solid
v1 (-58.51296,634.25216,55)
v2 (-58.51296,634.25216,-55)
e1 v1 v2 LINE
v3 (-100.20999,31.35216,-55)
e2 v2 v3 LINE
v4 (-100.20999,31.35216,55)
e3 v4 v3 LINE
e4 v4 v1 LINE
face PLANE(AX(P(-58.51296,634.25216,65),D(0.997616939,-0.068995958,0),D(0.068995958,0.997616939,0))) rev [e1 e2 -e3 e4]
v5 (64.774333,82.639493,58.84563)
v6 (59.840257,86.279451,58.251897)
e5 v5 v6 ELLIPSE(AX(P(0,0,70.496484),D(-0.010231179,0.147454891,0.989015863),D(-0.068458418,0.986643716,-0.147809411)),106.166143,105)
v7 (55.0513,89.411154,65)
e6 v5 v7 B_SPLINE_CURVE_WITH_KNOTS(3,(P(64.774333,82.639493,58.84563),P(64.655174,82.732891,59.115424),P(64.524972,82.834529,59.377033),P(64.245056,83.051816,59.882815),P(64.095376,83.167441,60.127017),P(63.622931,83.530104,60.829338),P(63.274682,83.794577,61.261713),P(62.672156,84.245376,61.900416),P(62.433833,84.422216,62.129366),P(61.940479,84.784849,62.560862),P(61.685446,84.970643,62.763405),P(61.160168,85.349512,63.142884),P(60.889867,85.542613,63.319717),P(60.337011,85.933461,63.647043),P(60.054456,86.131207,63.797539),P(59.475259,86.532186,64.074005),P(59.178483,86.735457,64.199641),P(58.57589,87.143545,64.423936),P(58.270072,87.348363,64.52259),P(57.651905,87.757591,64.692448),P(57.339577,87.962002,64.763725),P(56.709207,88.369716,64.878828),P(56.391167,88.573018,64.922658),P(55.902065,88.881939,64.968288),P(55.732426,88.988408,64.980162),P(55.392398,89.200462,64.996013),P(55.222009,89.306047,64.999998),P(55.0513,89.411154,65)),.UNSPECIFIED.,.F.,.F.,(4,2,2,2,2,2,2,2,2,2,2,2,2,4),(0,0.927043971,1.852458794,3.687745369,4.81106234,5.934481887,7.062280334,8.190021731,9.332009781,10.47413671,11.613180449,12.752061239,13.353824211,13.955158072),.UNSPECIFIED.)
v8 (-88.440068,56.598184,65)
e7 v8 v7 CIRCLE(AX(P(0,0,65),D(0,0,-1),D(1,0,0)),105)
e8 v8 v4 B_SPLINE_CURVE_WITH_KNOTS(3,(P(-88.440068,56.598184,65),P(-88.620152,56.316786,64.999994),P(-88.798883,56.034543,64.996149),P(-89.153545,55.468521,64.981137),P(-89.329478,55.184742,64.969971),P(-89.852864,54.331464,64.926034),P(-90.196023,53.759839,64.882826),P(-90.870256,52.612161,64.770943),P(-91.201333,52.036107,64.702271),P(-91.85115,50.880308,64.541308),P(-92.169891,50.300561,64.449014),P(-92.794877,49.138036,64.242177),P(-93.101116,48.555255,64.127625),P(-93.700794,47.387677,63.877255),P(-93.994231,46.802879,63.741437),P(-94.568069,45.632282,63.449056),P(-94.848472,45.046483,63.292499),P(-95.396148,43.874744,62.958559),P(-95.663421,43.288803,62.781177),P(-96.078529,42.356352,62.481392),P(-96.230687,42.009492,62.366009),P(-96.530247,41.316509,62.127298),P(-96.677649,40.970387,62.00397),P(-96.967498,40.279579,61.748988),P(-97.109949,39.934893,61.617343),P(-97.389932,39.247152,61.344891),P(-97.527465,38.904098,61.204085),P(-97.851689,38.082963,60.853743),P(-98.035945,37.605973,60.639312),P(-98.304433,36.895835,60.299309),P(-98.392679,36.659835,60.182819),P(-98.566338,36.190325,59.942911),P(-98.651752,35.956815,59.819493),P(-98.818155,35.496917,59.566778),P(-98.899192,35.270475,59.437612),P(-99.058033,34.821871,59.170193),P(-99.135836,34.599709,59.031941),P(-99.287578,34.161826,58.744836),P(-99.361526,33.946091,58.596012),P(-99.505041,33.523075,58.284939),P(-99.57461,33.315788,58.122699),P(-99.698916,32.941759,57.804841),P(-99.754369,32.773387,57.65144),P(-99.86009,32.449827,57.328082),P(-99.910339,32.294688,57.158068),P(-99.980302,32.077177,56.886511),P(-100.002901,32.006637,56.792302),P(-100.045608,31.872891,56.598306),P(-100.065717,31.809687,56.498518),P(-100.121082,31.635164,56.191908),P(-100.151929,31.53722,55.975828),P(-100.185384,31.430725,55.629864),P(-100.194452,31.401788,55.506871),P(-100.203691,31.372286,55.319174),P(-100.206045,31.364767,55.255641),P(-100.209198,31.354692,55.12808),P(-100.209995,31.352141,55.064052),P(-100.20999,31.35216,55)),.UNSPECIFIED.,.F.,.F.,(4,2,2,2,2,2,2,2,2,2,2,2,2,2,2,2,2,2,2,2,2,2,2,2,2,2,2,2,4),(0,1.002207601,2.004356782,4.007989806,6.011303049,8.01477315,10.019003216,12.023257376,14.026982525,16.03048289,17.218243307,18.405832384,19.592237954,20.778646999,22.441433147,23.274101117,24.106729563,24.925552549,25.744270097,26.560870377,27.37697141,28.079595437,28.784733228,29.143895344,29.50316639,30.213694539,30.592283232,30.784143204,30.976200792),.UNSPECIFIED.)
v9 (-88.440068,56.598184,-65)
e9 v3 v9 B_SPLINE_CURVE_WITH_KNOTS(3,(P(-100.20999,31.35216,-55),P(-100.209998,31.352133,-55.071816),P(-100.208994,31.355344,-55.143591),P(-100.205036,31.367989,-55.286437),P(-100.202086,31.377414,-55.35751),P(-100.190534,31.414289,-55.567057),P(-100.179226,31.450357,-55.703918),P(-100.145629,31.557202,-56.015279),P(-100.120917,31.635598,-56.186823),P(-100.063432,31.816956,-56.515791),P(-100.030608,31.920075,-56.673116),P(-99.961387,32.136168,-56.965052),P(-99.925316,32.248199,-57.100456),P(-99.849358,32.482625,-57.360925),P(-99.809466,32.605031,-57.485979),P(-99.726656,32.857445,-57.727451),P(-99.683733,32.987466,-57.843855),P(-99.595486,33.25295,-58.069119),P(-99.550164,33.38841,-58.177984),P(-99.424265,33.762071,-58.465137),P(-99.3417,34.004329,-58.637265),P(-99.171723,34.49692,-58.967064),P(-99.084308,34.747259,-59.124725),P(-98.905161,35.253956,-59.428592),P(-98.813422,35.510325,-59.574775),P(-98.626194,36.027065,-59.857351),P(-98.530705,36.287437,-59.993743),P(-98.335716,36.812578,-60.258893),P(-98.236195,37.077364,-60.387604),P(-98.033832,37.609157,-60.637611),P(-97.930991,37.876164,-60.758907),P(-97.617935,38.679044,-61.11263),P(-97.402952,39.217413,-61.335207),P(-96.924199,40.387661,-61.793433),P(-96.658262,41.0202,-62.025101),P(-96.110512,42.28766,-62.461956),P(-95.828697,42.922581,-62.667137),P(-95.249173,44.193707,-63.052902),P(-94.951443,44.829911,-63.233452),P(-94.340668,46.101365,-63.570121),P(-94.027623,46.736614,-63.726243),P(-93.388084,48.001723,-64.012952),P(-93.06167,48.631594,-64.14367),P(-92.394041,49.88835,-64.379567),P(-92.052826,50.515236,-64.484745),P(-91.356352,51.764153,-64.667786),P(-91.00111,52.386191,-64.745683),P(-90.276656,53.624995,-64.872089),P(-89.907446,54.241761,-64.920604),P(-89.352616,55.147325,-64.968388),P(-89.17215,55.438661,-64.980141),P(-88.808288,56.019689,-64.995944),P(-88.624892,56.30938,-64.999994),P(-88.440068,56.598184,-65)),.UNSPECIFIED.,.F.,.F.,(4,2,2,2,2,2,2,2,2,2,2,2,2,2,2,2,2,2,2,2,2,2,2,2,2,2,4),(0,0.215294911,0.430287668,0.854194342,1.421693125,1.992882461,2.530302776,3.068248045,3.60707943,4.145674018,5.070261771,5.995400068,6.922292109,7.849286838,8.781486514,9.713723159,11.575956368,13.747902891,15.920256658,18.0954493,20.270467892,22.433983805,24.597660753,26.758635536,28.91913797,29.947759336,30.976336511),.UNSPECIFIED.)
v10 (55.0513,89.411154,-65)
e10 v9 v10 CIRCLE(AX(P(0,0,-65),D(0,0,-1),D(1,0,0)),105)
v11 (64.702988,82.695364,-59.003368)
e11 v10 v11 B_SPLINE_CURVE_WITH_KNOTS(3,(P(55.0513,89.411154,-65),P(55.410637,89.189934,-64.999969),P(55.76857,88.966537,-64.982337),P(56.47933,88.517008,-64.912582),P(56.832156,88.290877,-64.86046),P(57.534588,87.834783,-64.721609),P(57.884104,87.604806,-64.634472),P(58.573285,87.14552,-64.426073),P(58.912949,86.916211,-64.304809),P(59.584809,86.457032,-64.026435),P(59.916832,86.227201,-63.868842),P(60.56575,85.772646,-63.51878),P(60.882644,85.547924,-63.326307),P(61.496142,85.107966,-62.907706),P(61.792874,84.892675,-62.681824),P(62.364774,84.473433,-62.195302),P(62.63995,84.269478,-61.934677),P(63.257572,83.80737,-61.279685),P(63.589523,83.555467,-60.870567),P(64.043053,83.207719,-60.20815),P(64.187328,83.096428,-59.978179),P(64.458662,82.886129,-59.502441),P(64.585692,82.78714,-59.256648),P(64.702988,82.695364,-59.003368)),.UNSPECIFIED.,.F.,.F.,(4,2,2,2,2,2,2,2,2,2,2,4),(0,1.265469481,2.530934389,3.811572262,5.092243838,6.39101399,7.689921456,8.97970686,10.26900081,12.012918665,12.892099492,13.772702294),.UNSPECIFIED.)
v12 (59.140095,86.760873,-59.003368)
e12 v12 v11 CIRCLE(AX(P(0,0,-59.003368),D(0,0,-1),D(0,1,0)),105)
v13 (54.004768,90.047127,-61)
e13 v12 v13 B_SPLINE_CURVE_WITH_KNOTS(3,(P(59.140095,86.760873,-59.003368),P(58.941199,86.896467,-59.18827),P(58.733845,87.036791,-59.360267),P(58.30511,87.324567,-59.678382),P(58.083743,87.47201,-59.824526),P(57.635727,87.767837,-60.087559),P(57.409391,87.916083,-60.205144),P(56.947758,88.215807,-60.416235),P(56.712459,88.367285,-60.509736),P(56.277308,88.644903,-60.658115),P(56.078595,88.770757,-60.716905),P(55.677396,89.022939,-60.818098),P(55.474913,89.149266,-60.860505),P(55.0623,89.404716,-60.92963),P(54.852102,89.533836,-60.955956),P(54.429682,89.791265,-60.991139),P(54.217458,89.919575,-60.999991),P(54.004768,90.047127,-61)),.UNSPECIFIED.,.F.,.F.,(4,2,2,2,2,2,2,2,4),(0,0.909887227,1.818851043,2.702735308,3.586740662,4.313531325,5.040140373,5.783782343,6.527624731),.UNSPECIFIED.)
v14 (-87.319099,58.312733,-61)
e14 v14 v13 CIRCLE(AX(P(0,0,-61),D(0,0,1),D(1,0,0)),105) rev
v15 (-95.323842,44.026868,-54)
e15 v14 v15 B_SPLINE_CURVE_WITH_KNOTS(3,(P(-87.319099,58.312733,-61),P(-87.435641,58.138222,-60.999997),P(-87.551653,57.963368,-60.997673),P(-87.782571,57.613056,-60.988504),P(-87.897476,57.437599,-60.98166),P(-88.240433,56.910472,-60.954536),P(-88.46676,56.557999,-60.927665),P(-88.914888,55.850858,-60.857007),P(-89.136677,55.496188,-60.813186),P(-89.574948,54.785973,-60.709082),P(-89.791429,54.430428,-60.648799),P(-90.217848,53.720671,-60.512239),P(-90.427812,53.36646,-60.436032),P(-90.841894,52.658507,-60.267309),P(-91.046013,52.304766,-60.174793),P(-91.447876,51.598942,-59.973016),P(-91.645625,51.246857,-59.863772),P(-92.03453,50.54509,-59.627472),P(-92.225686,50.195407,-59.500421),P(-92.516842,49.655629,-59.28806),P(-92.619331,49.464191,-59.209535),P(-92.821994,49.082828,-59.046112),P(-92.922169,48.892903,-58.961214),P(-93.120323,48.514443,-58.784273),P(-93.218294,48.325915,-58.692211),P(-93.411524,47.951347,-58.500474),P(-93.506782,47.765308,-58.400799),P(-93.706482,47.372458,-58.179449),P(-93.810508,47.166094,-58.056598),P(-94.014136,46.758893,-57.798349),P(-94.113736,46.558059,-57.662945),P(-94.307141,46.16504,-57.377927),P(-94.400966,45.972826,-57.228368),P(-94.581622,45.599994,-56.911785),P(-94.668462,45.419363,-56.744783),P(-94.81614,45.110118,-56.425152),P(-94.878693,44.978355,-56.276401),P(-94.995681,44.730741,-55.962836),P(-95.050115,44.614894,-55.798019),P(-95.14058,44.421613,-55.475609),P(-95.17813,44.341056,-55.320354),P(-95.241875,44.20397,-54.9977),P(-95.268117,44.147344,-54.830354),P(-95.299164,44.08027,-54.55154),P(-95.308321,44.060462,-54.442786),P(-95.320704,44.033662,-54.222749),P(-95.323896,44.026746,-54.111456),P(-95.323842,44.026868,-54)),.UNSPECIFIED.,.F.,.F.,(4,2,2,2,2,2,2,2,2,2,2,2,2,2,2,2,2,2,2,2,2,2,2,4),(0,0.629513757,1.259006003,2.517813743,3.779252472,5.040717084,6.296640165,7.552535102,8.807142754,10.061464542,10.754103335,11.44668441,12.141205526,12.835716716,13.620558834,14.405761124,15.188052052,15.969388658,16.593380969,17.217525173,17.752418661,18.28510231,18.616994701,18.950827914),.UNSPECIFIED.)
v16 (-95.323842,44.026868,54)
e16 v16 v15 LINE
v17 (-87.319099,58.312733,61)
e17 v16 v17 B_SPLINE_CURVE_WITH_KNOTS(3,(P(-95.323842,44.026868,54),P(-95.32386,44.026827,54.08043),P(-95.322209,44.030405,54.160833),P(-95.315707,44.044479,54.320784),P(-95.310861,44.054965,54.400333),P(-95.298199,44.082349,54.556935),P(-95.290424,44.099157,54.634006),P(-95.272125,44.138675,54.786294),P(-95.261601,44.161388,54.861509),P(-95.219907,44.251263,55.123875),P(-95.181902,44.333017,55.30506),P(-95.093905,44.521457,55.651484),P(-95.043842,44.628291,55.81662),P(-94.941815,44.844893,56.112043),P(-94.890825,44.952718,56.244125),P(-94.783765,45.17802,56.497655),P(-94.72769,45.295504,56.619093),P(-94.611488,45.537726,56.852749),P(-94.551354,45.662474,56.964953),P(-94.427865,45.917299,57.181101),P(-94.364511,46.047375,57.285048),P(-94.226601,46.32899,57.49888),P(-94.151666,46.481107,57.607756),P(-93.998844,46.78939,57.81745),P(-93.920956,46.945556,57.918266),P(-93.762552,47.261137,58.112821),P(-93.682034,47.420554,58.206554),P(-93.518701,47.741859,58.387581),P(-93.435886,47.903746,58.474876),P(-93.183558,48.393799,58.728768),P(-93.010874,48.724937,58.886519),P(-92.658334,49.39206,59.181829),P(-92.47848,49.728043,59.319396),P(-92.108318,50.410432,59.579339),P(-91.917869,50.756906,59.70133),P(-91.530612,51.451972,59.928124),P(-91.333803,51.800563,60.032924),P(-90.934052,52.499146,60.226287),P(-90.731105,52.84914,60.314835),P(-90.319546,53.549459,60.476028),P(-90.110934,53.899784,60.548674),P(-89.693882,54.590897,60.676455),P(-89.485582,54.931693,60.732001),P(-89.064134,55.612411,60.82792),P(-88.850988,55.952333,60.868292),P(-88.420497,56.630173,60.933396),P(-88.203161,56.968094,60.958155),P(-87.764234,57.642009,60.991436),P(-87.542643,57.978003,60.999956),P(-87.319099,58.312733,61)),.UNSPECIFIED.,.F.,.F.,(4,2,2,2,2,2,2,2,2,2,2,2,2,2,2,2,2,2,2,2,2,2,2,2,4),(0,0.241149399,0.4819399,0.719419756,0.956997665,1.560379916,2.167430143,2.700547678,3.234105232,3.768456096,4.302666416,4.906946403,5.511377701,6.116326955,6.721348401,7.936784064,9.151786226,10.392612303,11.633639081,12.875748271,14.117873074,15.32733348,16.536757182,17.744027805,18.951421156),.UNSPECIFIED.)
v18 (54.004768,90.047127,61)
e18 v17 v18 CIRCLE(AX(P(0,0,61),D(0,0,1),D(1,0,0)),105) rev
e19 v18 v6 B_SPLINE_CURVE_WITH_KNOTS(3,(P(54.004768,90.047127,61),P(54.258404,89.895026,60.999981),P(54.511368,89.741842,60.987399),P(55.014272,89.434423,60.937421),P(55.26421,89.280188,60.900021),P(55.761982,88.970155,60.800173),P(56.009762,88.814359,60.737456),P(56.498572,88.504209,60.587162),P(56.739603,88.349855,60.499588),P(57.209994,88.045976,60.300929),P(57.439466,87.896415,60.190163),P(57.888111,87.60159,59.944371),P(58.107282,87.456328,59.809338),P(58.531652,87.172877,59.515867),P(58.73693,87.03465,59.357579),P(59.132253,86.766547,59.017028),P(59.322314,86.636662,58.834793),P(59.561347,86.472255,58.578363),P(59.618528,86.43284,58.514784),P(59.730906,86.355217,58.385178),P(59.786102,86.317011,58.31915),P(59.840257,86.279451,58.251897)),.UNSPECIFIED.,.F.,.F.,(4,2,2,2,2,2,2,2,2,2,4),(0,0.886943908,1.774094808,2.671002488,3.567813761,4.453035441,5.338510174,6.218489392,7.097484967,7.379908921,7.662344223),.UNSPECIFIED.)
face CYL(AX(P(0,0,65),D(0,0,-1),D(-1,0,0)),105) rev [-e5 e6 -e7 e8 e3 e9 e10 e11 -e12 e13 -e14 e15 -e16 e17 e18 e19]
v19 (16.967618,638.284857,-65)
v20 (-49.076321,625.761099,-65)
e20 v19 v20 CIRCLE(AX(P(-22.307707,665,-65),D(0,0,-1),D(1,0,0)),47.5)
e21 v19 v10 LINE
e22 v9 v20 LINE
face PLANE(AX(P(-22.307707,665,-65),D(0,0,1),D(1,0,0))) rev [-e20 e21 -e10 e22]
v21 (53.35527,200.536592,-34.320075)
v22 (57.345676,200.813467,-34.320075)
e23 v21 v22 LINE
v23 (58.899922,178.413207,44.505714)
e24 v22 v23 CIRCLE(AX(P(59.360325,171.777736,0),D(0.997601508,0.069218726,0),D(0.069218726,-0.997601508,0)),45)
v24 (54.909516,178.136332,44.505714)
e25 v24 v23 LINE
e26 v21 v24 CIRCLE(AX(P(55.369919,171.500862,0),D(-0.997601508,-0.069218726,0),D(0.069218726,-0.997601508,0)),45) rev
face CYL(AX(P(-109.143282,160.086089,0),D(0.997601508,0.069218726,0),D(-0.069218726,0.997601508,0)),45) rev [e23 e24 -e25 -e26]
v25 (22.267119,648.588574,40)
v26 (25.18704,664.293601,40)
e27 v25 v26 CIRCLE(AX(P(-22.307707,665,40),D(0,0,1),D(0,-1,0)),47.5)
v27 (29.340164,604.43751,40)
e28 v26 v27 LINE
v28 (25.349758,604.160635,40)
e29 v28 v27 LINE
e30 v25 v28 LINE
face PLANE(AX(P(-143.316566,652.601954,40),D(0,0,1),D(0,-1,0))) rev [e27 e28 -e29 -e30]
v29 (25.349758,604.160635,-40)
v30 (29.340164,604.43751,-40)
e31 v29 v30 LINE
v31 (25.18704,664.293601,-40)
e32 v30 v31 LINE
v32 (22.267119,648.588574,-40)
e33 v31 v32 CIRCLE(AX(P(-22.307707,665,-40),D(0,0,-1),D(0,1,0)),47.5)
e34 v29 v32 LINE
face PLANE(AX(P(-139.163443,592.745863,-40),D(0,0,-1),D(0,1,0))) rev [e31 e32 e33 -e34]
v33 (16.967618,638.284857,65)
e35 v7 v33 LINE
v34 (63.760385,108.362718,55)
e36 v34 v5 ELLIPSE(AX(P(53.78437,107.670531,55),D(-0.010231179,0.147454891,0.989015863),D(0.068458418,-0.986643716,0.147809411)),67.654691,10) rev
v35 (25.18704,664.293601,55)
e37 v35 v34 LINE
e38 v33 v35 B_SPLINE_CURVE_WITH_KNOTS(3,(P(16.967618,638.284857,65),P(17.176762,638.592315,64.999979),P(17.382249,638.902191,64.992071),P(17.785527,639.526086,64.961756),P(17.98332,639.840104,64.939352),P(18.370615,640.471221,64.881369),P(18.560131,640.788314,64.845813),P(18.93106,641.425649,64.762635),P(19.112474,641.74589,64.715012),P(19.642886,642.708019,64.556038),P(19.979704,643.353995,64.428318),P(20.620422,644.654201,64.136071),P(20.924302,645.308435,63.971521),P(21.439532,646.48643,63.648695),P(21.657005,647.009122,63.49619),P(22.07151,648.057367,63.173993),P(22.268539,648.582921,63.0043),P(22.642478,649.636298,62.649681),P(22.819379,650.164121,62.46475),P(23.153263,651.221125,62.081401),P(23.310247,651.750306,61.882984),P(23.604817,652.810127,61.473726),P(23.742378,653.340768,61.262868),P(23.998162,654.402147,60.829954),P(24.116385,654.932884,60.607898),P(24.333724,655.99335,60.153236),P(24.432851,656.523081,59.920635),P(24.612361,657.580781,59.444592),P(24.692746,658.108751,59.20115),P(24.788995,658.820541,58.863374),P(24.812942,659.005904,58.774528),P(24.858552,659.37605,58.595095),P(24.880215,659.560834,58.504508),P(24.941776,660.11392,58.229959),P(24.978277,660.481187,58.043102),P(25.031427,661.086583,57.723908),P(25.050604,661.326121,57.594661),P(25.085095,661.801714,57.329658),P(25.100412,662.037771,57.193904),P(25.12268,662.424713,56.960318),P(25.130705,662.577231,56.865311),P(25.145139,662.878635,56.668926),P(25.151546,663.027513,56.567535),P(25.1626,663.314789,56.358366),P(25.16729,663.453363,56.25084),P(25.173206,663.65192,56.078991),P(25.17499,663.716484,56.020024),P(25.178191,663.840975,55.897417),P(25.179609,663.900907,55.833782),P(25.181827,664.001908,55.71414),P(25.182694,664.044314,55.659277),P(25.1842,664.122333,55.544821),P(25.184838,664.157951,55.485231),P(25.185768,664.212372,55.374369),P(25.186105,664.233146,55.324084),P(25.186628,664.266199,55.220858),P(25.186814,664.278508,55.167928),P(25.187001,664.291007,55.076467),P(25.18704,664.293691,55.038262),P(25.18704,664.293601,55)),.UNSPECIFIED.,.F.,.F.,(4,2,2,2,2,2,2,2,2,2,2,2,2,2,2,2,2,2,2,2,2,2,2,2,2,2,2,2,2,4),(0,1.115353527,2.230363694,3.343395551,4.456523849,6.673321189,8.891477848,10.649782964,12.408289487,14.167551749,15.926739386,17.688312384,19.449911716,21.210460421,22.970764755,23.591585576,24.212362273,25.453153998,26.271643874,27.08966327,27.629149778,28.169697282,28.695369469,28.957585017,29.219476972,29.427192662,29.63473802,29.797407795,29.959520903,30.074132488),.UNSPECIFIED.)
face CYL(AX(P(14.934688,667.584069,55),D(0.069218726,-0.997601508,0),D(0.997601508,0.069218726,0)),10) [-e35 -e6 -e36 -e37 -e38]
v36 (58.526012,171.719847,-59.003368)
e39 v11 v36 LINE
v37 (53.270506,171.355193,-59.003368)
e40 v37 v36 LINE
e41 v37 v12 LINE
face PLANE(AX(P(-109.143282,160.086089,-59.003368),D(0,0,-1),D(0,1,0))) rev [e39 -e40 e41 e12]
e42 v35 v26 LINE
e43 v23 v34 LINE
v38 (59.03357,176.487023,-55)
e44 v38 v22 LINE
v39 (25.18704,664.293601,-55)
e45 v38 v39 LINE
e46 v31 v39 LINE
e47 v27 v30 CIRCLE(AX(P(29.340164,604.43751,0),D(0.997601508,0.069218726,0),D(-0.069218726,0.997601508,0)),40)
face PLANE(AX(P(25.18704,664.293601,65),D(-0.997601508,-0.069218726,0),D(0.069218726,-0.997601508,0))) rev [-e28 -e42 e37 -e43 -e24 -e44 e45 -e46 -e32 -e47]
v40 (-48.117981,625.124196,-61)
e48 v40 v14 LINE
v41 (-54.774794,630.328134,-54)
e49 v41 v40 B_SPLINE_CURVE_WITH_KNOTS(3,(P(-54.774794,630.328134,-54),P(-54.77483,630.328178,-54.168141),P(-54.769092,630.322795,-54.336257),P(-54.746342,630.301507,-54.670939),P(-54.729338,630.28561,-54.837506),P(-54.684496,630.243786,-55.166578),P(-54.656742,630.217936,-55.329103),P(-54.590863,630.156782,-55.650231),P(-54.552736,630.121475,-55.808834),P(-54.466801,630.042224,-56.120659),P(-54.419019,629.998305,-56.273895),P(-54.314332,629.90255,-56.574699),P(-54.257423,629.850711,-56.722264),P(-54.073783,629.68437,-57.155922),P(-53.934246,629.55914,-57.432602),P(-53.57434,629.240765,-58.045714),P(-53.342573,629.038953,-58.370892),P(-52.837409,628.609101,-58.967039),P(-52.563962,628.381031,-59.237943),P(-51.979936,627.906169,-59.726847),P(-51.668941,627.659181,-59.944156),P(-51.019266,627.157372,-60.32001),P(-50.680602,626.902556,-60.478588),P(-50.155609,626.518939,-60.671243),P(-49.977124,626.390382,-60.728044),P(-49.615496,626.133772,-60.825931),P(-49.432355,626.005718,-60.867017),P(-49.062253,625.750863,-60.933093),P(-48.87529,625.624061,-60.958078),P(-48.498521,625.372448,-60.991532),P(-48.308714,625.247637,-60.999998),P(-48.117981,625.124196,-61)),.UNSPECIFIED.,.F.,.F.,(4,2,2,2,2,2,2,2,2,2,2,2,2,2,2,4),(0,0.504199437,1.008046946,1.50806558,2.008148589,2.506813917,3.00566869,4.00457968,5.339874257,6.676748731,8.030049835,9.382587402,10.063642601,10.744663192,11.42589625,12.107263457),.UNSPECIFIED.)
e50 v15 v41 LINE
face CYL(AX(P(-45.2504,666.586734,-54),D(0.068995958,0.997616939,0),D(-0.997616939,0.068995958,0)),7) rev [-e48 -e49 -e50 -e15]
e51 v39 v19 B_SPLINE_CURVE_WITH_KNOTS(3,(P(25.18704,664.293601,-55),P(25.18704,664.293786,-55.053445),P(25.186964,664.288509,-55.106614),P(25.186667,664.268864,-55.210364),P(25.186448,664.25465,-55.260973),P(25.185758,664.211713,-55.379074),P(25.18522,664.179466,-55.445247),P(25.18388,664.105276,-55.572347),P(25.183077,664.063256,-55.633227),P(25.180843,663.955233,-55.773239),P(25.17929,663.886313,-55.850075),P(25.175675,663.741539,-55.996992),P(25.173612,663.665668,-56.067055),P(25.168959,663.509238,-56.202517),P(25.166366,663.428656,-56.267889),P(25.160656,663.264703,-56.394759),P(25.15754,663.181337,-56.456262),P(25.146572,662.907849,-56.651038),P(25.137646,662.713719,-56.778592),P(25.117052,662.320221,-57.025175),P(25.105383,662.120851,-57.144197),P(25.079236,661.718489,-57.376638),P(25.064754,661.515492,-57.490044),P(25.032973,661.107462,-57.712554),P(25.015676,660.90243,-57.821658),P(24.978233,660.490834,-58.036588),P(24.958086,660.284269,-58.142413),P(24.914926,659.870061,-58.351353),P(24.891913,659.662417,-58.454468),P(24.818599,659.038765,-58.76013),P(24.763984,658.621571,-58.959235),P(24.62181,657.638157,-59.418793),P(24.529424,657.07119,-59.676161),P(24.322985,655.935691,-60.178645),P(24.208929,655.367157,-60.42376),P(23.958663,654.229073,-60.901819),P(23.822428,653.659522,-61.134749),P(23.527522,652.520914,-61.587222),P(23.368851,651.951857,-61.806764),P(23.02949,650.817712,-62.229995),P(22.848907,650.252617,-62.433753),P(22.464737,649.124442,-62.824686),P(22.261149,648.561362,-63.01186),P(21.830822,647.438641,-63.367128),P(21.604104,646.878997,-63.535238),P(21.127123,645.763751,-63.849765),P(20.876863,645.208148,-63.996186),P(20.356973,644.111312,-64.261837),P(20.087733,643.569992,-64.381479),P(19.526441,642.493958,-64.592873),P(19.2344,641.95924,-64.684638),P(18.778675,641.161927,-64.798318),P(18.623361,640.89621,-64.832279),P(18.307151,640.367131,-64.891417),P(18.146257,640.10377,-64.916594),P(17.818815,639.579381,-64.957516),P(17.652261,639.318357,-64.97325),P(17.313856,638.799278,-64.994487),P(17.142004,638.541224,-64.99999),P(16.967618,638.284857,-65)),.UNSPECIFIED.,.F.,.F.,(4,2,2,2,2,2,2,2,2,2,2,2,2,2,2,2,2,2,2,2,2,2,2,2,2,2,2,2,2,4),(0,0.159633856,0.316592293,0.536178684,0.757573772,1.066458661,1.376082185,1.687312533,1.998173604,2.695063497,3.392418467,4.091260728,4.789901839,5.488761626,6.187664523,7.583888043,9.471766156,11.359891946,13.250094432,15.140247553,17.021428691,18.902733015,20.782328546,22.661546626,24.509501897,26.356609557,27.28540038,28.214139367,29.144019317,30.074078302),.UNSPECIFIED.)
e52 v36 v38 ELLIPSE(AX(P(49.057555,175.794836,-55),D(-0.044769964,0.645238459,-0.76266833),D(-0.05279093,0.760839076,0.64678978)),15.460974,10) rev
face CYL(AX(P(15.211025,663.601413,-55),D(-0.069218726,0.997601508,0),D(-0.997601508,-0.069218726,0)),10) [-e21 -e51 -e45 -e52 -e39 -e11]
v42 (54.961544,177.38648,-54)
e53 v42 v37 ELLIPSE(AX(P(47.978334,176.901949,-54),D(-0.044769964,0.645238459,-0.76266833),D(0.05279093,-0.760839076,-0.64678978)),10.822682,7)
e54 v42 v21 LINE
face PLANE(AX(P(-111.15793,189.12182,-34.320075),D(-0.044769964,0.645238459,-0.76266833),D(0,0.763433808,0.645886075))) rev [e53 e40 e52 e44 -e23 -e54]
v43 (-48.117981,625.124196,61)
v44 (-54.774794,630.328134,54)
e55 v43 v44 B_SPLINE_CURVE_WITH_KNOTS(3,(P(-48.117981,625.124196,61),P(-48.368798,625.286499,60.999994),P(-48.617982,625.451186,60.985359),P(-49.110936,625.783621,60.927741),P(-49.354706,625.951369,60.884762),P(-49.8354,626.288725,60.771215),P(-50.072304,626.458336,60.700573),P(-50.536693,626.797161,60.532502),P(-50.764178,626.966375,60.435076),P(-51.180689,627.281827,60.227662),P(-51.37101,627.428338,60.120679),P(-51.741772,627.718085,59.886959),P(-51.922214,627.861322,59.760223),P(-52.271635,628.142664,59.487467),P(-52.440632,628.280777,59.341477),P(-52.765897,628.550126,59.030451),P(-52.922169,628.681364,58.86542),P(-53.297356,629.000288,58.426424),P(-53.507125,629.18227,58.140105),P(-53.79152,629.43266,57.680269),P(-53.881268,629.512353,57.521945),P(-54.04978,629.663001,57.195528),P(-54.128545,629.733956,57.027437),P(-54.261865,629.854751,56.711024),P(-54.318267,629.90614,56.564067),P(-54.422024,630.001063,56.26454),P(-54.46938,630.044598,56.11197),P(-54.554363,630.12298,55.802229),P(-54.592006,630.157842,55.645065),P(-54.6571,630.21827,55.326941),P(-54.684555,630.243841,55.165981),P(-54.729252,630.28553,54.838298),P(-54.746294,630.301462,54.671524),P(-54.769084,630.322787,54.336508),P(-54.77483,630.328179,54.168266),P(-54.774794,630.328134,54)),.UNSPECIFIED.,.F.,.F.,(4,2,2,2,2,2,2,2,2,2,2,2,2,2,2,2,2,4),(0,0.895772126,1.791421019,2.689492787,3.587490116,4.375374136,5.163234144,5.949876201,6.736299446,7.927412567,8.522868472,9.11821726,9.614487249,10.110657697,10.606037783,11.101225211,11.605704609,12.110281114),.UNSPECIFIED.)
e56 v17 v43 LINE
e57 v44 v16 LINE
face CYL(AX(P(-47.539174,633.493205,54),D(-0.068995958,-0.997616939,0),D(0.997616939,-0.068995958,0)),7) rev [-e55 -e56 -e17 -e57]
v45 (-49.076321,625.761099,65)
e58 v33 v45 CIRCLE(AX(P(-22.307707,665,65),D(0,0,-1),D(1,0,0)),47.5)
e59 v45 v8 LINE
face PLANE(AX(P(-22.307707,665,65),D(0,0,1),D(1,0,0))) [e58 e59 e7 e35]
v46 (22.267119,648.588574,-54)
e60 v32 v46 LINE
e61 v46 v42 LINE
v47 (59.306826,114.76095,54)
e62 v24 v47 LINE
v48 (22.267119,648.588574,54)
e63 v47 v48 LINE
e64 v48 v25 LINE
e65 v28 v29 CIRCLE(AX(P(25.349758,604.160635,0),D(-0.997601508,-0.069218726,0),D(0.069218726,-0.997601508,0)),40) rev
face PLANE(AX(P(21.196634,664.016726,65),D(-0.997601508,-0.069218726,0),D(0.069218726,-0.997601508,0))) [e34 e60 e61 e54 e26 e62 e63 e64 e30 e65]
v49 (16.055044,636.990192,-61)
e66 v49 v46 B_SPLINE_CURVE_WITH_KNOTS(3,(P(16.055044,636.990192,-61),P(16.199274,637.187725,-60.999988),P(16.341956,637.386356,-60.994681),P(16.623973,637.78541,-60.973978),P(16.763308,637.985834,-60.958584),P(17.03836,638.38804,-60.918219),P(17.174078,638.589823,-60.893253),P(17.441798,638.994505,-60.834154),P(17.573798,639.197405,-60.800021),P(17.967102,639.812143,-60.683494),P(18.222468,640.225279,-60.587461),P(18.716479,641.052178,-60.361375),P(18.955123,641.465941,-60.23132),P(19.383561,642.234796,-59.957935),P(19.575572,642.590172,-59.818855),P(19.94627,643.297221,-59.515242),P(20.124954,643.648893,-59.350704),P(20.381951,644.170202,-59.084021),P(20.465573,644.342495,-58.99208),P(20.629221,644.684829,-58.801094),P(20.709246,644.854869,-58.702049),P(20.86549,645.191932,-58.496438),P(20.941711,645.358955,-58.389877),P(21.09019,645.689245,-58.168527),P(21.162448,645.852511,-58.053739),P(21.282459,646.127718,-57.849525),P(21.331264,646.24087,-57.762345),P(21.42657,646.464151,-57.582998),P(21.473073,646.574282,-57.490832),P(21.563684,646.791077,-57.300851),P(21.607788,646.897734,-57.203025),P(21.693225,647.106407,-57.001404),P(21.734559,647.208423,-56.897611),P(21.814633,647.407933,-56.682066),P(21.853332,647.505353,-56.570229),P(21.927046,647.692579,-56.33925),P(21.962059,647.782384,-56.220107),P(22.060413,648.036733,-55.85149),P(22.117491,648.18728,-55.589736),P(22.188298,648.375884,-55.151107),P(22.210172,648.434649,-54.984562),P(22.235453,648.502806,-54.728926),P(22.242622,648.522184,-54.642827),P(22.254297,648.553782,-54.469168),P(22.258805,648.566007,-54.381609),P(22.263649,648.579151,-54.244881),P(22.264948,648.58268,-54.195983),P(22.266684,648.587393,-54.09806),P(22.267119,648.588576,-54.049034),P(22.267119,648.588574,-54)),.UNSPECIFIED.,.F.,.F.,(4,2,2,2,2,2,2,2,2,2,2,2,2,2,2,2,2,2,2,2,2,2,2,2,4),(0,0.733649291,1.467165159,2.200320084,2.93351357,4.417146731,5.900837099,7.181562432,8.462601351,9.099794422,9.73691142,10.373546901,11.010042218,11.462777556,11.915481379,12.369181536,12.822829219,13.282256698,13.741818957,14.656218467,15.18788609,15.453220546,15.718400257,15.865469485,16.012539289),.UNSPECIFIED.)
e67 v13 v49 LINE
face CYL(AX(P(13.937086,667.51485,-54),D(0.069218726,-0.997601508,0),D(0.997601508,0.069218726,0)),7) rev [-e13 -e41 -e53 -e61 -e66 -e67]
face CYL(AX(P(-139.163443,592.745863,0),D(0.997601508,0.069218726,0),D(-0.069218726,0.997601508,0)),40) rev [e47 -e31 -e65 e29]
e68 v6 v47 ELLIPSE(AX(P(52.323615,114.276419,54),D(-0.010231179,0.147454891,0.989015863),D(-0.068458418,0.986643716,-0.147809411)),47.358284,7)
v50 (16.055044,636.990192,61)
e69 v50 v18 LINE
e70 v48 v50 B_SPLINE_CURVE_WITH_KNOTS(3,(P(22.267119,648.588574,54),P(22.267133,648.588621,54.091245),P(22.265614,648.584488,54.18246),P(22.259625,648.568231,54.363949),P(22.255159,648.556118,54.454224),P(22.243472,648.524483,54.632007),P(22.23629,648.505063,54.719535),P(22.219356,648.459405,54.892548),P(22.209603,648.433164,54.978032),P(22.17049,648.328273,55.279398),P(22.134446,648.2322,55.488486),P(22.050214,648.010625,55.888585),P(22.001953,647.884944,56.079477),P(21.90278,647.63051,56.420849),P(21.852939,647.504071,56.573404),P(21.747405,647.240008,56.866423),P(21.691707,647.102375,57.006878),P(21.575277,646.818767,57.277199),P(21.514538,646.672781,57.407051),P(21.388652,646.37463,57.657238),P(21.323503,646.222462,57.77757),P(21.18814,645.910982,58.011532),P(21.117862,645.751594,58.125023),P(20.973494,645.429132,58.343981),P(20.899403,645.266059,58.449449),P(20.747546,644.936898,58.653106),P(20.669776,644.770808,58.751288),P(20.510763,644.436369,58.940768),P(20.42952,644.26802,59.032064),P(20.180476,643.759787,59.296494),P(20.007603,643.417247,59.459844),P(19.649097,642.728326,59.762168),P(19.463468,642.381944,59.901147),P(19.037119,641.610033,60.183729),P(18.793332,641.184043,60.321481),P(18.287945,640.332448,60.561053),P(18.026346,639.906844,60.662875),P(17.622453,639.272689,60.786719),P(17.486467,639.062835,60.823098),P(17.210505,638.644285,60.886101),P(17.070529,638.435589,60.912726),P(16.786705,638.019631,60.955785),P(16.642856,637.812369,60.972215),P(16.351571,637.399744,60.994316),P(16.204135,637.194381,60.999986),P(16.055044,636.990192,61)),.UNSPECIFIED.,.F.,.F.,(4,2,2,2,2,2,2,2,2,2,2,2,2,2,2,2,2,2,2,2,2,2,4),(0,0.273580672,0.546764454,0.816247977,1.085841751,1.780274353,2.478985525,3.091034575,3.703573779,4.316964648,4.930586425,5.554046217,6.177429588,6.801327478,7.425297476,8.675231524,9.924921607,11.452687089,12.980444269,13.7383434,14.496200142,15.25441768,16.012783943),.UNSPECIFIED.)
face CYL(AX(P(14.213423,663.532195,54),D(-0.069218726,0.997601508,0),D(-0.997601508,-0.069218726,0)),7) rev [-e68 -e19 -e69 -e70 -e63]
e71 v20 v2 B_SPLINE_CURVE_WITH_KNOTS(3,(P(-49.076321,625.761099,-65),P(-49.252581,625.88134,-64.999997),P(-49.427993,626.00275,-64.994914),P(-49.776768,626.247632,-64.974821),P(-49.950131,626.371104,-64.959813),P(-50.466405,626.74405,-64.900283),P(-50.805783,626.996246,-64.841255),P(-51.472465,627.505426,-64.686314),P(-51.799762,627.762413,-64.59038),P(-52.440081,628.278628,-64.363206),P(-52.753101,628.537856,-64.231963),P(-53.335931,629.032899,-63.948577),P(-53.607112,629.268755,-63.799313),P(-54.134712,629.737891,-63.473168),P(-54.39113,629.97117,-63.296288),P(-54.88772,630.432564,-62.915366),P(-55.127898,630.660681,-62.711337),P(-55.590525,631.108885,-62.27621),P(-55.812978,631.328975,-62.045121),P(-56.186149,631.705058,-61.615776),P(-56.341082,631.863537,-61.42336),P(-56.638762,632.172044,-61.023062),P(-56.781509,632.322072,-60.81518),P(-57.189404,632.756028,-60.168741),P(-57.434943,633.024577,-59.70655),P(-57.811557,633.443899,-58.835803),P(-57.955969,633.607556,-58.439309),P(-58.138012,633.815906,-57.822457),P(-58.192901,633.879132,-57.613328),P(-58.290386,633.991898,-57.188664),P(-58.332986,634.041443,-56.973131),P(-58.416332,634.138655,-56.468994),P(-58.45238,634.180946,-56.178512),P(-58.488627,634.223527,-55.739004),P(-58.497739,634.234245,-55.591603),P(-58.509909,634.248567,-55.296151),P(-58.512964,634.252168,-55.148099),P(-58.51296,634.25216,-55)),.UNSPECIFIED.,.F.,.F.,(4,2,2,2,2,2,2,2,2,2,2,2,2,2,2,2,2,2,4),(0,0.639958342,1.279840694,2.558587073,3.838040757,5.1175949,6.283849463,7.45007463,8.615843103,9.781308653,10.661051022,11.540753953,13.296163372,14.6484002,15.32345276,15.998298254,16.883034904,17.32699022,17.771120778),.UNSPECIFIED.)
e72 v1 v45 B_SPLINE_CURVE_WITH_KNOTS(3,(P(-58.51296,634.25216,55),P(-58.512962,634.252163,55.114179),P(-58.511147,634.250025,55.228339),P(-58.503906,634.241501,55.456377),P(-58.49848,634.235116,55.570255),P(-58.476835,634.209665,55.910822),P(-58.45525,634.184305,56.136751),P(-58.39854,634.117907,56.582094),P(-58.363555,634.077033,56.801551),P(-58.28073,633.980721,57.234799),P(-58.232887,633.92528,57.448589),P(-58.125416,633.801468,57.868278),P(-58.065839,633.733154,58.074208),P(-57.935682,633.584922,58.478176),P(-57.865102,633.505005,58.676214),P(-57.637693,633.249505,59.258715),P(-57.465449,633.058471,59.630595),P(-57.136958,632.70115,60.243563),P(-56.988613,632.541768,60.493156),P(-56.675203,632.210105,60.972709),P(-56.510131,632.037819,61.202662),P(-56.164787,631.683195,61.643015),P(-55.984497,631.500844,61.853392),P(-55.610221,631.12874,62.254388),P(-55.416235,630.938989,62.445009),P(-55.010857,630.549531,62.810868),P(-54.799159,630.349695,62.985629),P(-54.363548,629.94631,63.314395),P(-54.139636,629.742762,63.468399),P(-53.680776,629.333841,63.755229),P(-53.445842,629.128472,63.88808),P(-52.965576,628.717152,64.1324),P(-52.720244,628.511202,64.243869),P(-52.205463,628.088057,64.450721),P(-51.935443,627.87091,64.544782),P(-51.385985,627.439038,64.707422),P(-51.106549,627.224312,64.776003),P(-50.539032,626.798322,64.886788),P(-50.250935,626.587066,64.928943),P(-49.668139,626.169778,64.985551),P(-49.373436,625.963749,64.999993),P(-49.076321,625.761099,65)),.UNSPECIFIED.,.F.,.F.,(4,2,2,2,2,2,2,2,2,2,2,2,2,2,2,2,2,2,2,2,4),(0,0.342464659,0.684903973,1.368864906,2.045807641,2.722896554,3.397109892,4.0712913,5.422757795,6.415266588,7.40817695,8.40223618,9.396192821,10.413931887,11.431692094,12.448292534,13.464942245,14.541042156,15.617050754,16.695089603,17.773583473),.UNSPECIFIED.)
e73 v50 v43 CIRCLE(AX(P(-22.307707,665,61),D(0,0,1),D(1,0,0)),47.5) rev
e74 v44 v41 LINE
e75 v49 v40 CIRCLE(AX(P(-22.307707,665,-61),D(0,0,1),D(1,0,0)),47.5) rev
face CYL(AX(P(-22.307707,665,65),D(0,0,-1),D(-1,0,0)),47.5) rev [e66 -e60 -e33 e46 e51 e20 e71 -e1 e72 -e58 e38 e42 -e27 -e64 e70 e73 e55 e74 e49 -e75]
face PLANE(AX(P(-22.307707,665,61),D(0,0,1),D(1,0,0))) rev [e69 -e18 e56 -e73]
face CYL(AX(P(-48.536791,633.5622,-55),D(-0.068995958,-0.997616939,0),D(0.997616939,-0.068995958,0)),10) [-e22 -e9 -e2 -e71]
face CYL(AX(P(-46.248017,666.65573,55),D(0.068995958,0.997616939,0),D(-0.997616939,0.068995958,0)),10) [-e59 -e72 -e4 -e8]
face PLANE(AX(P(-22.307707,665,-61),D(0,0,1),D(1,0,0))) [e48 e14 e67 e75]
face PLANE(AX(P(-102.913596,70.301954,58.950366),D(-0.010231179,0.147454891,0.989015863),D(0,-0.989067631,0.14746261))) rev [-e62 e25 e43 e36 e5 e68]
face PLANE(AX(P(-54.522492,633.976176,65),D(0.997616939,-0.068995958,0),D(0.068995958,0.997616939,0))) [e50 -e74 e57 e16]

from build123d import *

# Parameters (mm, degrees)
EXTRUDE_1_DEPTH     = 65
SHELL_1_T           = -4
CUT_EXTRUDE_1_REACH = 686.315
CUT_EXTRUDE_2_REACH = 686.315
FILLET_2_R          = 10
FILLET_3_R          = 7


with BuildPart() as part:
    # 草图1 → 凸台-拉伸1 (new, symmetric)
    with BuildSketch(Plane.XY):
        with BuildLine():
            Line((-58.512960007, 634.252160061), (-100.209989819, 31.352160061))
            ThreePointArc((-100.209989819, 31.352160061), (-30.672049595, 100.420243844), (65.590010181, 81.993600753))
            Line((65.590010181, 81.993600753), (25.187039993, 664.293600753))
            ThreePointArc((25.187039993, 664.293600753), (-6.261361418, 620.292452643), (-58.512960007, 634.252160061))
        make_face()
    extrude(amount=EXTRUDE_1_DEPTH, both=True)

    # 抽壳1
    shell_1_openings = [part.faces().sort_by_distance(p)[0] for p in [
        (-30.672049595, 100.420243844, 0),
        (-6.261361418, 620.292452643, 0),
    ]]
    offset(amount=SHELL_1_T, openings=shell_1_openings, kind=Kind.INTERSECTION)

    # 草图2 → 切除-拉伸1 (cut, up to next)
    with BuildSketch(Plane(origin=(70.93763316, 4.922017994, 0), x_dir=(0, 0, -1), z_dir=(0.9976015076237793, 0.06921872569444461, 0)), mode=Mode.PRIVATE) as cut_extrude_1_sk1:
        with BuildLine():
            Line((-40, 660.956882804), (-40, 600.956882804))
            ThreePointArc((-40, 600.956882804), (0, 560.956882804), (40, 600.956882804))
            Line((40, 600.956882804), (40, 660.956882804))
            Line((40, 660.956882804), (-40, 660.956882804))
        make_face()
    cut_extrude_1_tool1 = extrude(cut_extrude_1_sk1.sketch, amount=-CUT_EXTRUDE_1_REACH, mode=Mode.PRIVATE) & part.part
    add(cut_extrude_1_tool1.solids().sort_by_distance((28.381063, 618.26036, 0))[0], mode=Mode.SUBTRACT)

    # 草图3 → 切除-拉伸2 (cut, up to next)
    with BuildSketch(Plane(origin=(70.93763316, 4.922017994, 0), x_dir=(0, 0, -1), z_dir=(0.9976015076237793, 0.06921872569444461, 0)), mode=Mode.PRIVATE) as cut_extrude_2_sk1:
        with BuildLine():
            Line((-58.950365875, 77.256882804), (-44.505713851, 173.908306305))
            ThreePointArc((-44.505713851, 173.908306305), (-12.328164841, 210.535241733), (34.320074836, 196.362422882))
            Line((34.320074836, 196.362422882), (59.003367844, 167.256882804))
            Line((59.003367844, 167.256882804), (59.003367844, 77.256882804))
            Line((59.003367844, 77.256882804), (-58.950365875, 77.256882804))
        make_face()
    cut_extrude_2_tool1 = extrude(cut_extrude_2_sk1.sketch, amount=-CUT_EXTRUDE_2_REACH, mode=Mode.PRIVATE) & part.part
    add(cut_extrude_2_tool1.solids().sort_by_distance((61.423964, 142.035935, -3.018476))[0], mode=Mode.SUBTRACT)

    # 圆角2
    fillet_2_edges = [part.edges().sort_by_distance(p)[0] for p in [
        (45.388525087, 373.143600753, -65),
        (45.388525087, 373.143600753, 65),
        (-79.361474913, 332.802160061, 65),
        (-79.361474913, 332.802160061, -65),
    ]]
    fillet(fillet_2_edges, radius=FILLET_2_R)

    # 圆角3
    # the kernel refuses this fillet: 7 mm, written as the material it adds along each edge
    with BuildSketch(Plane(origin=(-53.567364395, 647.786430481, 61), x_dir=(0, 0, -1), z_dir=(-0.06899595830556898, -0.9976169393797883, 0))) as fillet_3_piece_1_section:
        with BuildLine():
            CenterArc((FILLET_3_R, FILLET_3_R), FILLET_3_R, 180, 90)
            Line((0, FILLET_3_R), (0, 0))
            Line((0, 0), (FILLET_3_R, 0))
        make_face()
    fillet_3_piece_1 = extrude(amount=622.701795047, mode=Mode.PRIVATE)
    fillet_3_piece_1 = fillet_3_piece_1 - Plane(origin=(-22.307707086, 665, 59.408269391), x_dir=(0.9998894121907572, -0.014871563092767819, 0), z_dir=(0, 0, 1)) * Cylinder(47.5, 1274, mode=Mode.PRIVATE)
    fillet_3_piece_1 = fillet_3_piece_1 - Plane(origin=(0, 0, 59.408269391), x_dir=(-0.9543808554191496, 0.29859200057840163, 0), z_dir=(0, 0, 1)) * Cylinder(105, 1274, mode=Mode.PRIVATE)
    add(fillet_3_piece_1)
    with BuildSketch(Plane(origin=(21.055790856, 666.046599906, -61), x_dir=(0, 0, 1), z_dir=(0.06921872569444461, -0.9976015076237793, 0))) as fillet_3_piece_2_section:
        with BuildLine():
            CenterArc((FILLET_3_R, FILLET_3_R), FILLET_3_R, 180, 90)
            Line((0, FILLET_3_R), (0, 0))
            Line((0, 0), (FILLET_3_R, 0))
        make_face()
    fillet_3_piece_2 = extrude(amount=599.735885548, mode=Mode.PRIVATE)
    fillet_3_piece_2 = fillet_3_piece_2 - Plane(origin=(-22.307707086, 665, -57.567140741), x_dir=(0.9998894121907572, -0.014871563092767819, 0), z_dir=(0, 0, 1)) * Cylinder(47.5, 1228, mode=Mode.PRIVATE)
    fillet_3_piece_2 = split(fillet_3_piece_2, bisect_by=Plane(origin=(45.190808802, 311.119705723, 59.715559847), z_dir=(-0.04476996432990456, 0.6452384591552827, -0.7626683296956915)), keep=Keep.TOP, mode=Mode.PRIVATE)
    fillet_3_piece_2 = split(fillet_3_piece_2, bisect_by=Plane(origin=(38.306109231, 410.34410782, -59.003367844), z_dir=(0, 0, 1)), keep=Keep.TOP, mode=Mode.PRIVATE)
    add(fillet_3_piece_2)
    with BuildSketch(Plane(origin=(21.055790856, 666.046599906, -61), x_dir=(0, 0, 1), z_dir=(0.06921872569444461, -0.9976015076237793, 0))) as fillet_3_piece_3_section:
        with BuildLine():
            CenterArc((FILLET_3_R, FILLET_3_R), FILLET_3_R, 180, 90)
            Line((0, FILLET_3_R), (0, 0))
            Line((0, 0), (FILLET_3_R, 0))
        make_face()
    fillet_3_piece_3 = extrude(amount=599.735885548, mode=Mode.PRIVATE)
    fillet_3_piece_3 = fillet_3_piece_3 - Plane(origin=(-22.307707086, 665, -60.275474349), x_dir=(0.9998894121907572, -0.014871563092767819, 0), z_dir=(0, 0, 1)) * Cylinder(47.5, 1228, mode=Mode.PRIVATE)
    fillet_3_piece_3 = split(fillet_3_piece_3, bisect_by=Plane(origin=(43.813424167, 307.914474781, 57.084700881), z_dir=(-0.04476996432990456, 0.6452384591552827, -0.7626683296956915)), keep=Keep.TOP, mode=Mode.PRIVATE)
    fillet_3_piece_3 = split(fillet_3_piece_3, bisect_by=Plane(origin=(36.9241767, 407.204422564, -59.003367844), z_dir=(0, 0, -1)), keep=Keep.TOP, mode=Mode.PRIVATE)
    add(fillet_3_piece_3)
    with BuildSketch(Plane(origin=(21.055790856, 666.046599906, -61), x_dir=(0, 0, 1), z_dir=(0.06921872569444461, -0.9976015076237793, 0))) as fillet_3_piece_4_section:
        with BuildLine():
            CenterArc((FILLET_3_R, FILLET_3_R), FILLET_3_R, 180, 90)
            Line((0, FILLET_3_R), (0, 0))
            Line((0, 0), (FILLET_3_R, 0))
        make_face()
    fillet_3_piece_4 = extrude(amount=599.735885548, mode=Mode.PRIVATE)
    fillet_3_piece_4 = split(fillet_3_piece_4, bisect_by=Plane(origin=(55.090839822, 145.685566131, -80.827437921), z_dir=(0.04476996432990456, -0.6452384591552827, 0.7626683296956915)), keep=Keep.TOP, mode=Mode.PRIVATE)
    fillet_3_piece_4 = fillet_3_piece_4 - Plane(origin=(0, 0, -60.266827154), x_dir=(-0.9543808554191496, 0.29859200057840163, 0), z_dir=(0, 0, 1)) * Cylinder(105, 1228, mode=Mode.PRIVATE)
    fillet_3_piece_4 = split(fillet_3_piece_4, bisect_by=Plane(origin=(56.29778362, 128.290721879, -59.003367844), z_dir=(0, 0, -1)), keep=Keep.TOP, mode=Mode.PRIVATE)
    add(fillet_3_piece_4)
    with BuildSketch(Plane(origin=(-96.531271483, 26.56857156, -61), x_dir=(0.9976169393797882, -0.06899595830556898, 0), z_dir=(0.06899595830556898, 0.9976169393797883, 0))) as fillet_3_piece_5_section:
        with BuildLine():
            CenterArc((FILLET_3_R, -FILLET_3_R), FILLET_3_R, 90, 90)
            Line((0, -FILLET_3_R), (0, 0))
            Line((0, 0), (FILLET_3_R, 0))
        make_face()
    fillet_3_piece_5 = extrude(amount=622.701795047, mode=Mode.PRIVATE)
    fillet_3_piece_5 = fillet_3_piece_5 - Plane(origin=(-22.307707086, 665, -59.408268286), x_dir=(0.9998894121907572, -0.014871563092767819, 0), z_dir=(0, 0, 1)) * Cylinder(47.5, 1274, mode=Mode.PRIVATE)
    fillet_3_piece_5 = fillet_3_piece_5 - Plane(origin=(0, 0, -59.408268286), x_dir=(-0.9543808554191496, 0.29859200057840163, 0), z_dir=(0, 0, 1)) * Cylinder(105, 1274, mode=Mode.PRIVATE)
    add(fillet_3_piece_5)
    with BuildSketch(Plane(origin=(21.055790856, 666.046599906, 61), x_dir=(0, 0, -1), z_dir=(0.06921872569444461, -0.9976015076237793, 0))) as fillet_3_piece_6_section:
        with BuildLine():
            CenterArc((FILLET_3_R, -FILLET_3_R), FILLET_3_R, 90, 90)
            Line((0, -FILLET_3_R), (0, 0))
            Line((0, 0), (FILLET_3_R, 0))
        make_face()
    fillet_3_piece_6 = extrude(amount=599.735885548, mode=Mode.PRIVATE)
    fillet_3_piece_6 = fillet_3_piece_6 - Plane(origin=(-22.307707086, 665, 59.420291377), x_dir=(0.9998894121907572, -0.014871563092767819, 0), z_dir=(0, 0, 1)) * Cylinder(47.5, 1228, mode=Mode.PRIVATE)
    fillet_3_piece_6 = split(fillet_3_piece_6, bisect_by=Plane(origin=(40.666871165, 360.585918915, 17.156503264), z_dir=(-0.010231179084037917, 0.1474548913838828, 0.9890158633619169)), keep=Keep.TOP, mode=Mode.PRIVATE)
    fillet_3_piece_6 = fillet_3_piece_6 - Plane(origin=(0, 0, 59.420291377), x_dir=(-0.9543808554191496, 0.29859200057840163, 0), z_dir=(0, 0, 1)) * Cylinder(105, 1228, mode=Mode.PRIVATE)
    add(fillet_3_piece_6)


solid = part.part
